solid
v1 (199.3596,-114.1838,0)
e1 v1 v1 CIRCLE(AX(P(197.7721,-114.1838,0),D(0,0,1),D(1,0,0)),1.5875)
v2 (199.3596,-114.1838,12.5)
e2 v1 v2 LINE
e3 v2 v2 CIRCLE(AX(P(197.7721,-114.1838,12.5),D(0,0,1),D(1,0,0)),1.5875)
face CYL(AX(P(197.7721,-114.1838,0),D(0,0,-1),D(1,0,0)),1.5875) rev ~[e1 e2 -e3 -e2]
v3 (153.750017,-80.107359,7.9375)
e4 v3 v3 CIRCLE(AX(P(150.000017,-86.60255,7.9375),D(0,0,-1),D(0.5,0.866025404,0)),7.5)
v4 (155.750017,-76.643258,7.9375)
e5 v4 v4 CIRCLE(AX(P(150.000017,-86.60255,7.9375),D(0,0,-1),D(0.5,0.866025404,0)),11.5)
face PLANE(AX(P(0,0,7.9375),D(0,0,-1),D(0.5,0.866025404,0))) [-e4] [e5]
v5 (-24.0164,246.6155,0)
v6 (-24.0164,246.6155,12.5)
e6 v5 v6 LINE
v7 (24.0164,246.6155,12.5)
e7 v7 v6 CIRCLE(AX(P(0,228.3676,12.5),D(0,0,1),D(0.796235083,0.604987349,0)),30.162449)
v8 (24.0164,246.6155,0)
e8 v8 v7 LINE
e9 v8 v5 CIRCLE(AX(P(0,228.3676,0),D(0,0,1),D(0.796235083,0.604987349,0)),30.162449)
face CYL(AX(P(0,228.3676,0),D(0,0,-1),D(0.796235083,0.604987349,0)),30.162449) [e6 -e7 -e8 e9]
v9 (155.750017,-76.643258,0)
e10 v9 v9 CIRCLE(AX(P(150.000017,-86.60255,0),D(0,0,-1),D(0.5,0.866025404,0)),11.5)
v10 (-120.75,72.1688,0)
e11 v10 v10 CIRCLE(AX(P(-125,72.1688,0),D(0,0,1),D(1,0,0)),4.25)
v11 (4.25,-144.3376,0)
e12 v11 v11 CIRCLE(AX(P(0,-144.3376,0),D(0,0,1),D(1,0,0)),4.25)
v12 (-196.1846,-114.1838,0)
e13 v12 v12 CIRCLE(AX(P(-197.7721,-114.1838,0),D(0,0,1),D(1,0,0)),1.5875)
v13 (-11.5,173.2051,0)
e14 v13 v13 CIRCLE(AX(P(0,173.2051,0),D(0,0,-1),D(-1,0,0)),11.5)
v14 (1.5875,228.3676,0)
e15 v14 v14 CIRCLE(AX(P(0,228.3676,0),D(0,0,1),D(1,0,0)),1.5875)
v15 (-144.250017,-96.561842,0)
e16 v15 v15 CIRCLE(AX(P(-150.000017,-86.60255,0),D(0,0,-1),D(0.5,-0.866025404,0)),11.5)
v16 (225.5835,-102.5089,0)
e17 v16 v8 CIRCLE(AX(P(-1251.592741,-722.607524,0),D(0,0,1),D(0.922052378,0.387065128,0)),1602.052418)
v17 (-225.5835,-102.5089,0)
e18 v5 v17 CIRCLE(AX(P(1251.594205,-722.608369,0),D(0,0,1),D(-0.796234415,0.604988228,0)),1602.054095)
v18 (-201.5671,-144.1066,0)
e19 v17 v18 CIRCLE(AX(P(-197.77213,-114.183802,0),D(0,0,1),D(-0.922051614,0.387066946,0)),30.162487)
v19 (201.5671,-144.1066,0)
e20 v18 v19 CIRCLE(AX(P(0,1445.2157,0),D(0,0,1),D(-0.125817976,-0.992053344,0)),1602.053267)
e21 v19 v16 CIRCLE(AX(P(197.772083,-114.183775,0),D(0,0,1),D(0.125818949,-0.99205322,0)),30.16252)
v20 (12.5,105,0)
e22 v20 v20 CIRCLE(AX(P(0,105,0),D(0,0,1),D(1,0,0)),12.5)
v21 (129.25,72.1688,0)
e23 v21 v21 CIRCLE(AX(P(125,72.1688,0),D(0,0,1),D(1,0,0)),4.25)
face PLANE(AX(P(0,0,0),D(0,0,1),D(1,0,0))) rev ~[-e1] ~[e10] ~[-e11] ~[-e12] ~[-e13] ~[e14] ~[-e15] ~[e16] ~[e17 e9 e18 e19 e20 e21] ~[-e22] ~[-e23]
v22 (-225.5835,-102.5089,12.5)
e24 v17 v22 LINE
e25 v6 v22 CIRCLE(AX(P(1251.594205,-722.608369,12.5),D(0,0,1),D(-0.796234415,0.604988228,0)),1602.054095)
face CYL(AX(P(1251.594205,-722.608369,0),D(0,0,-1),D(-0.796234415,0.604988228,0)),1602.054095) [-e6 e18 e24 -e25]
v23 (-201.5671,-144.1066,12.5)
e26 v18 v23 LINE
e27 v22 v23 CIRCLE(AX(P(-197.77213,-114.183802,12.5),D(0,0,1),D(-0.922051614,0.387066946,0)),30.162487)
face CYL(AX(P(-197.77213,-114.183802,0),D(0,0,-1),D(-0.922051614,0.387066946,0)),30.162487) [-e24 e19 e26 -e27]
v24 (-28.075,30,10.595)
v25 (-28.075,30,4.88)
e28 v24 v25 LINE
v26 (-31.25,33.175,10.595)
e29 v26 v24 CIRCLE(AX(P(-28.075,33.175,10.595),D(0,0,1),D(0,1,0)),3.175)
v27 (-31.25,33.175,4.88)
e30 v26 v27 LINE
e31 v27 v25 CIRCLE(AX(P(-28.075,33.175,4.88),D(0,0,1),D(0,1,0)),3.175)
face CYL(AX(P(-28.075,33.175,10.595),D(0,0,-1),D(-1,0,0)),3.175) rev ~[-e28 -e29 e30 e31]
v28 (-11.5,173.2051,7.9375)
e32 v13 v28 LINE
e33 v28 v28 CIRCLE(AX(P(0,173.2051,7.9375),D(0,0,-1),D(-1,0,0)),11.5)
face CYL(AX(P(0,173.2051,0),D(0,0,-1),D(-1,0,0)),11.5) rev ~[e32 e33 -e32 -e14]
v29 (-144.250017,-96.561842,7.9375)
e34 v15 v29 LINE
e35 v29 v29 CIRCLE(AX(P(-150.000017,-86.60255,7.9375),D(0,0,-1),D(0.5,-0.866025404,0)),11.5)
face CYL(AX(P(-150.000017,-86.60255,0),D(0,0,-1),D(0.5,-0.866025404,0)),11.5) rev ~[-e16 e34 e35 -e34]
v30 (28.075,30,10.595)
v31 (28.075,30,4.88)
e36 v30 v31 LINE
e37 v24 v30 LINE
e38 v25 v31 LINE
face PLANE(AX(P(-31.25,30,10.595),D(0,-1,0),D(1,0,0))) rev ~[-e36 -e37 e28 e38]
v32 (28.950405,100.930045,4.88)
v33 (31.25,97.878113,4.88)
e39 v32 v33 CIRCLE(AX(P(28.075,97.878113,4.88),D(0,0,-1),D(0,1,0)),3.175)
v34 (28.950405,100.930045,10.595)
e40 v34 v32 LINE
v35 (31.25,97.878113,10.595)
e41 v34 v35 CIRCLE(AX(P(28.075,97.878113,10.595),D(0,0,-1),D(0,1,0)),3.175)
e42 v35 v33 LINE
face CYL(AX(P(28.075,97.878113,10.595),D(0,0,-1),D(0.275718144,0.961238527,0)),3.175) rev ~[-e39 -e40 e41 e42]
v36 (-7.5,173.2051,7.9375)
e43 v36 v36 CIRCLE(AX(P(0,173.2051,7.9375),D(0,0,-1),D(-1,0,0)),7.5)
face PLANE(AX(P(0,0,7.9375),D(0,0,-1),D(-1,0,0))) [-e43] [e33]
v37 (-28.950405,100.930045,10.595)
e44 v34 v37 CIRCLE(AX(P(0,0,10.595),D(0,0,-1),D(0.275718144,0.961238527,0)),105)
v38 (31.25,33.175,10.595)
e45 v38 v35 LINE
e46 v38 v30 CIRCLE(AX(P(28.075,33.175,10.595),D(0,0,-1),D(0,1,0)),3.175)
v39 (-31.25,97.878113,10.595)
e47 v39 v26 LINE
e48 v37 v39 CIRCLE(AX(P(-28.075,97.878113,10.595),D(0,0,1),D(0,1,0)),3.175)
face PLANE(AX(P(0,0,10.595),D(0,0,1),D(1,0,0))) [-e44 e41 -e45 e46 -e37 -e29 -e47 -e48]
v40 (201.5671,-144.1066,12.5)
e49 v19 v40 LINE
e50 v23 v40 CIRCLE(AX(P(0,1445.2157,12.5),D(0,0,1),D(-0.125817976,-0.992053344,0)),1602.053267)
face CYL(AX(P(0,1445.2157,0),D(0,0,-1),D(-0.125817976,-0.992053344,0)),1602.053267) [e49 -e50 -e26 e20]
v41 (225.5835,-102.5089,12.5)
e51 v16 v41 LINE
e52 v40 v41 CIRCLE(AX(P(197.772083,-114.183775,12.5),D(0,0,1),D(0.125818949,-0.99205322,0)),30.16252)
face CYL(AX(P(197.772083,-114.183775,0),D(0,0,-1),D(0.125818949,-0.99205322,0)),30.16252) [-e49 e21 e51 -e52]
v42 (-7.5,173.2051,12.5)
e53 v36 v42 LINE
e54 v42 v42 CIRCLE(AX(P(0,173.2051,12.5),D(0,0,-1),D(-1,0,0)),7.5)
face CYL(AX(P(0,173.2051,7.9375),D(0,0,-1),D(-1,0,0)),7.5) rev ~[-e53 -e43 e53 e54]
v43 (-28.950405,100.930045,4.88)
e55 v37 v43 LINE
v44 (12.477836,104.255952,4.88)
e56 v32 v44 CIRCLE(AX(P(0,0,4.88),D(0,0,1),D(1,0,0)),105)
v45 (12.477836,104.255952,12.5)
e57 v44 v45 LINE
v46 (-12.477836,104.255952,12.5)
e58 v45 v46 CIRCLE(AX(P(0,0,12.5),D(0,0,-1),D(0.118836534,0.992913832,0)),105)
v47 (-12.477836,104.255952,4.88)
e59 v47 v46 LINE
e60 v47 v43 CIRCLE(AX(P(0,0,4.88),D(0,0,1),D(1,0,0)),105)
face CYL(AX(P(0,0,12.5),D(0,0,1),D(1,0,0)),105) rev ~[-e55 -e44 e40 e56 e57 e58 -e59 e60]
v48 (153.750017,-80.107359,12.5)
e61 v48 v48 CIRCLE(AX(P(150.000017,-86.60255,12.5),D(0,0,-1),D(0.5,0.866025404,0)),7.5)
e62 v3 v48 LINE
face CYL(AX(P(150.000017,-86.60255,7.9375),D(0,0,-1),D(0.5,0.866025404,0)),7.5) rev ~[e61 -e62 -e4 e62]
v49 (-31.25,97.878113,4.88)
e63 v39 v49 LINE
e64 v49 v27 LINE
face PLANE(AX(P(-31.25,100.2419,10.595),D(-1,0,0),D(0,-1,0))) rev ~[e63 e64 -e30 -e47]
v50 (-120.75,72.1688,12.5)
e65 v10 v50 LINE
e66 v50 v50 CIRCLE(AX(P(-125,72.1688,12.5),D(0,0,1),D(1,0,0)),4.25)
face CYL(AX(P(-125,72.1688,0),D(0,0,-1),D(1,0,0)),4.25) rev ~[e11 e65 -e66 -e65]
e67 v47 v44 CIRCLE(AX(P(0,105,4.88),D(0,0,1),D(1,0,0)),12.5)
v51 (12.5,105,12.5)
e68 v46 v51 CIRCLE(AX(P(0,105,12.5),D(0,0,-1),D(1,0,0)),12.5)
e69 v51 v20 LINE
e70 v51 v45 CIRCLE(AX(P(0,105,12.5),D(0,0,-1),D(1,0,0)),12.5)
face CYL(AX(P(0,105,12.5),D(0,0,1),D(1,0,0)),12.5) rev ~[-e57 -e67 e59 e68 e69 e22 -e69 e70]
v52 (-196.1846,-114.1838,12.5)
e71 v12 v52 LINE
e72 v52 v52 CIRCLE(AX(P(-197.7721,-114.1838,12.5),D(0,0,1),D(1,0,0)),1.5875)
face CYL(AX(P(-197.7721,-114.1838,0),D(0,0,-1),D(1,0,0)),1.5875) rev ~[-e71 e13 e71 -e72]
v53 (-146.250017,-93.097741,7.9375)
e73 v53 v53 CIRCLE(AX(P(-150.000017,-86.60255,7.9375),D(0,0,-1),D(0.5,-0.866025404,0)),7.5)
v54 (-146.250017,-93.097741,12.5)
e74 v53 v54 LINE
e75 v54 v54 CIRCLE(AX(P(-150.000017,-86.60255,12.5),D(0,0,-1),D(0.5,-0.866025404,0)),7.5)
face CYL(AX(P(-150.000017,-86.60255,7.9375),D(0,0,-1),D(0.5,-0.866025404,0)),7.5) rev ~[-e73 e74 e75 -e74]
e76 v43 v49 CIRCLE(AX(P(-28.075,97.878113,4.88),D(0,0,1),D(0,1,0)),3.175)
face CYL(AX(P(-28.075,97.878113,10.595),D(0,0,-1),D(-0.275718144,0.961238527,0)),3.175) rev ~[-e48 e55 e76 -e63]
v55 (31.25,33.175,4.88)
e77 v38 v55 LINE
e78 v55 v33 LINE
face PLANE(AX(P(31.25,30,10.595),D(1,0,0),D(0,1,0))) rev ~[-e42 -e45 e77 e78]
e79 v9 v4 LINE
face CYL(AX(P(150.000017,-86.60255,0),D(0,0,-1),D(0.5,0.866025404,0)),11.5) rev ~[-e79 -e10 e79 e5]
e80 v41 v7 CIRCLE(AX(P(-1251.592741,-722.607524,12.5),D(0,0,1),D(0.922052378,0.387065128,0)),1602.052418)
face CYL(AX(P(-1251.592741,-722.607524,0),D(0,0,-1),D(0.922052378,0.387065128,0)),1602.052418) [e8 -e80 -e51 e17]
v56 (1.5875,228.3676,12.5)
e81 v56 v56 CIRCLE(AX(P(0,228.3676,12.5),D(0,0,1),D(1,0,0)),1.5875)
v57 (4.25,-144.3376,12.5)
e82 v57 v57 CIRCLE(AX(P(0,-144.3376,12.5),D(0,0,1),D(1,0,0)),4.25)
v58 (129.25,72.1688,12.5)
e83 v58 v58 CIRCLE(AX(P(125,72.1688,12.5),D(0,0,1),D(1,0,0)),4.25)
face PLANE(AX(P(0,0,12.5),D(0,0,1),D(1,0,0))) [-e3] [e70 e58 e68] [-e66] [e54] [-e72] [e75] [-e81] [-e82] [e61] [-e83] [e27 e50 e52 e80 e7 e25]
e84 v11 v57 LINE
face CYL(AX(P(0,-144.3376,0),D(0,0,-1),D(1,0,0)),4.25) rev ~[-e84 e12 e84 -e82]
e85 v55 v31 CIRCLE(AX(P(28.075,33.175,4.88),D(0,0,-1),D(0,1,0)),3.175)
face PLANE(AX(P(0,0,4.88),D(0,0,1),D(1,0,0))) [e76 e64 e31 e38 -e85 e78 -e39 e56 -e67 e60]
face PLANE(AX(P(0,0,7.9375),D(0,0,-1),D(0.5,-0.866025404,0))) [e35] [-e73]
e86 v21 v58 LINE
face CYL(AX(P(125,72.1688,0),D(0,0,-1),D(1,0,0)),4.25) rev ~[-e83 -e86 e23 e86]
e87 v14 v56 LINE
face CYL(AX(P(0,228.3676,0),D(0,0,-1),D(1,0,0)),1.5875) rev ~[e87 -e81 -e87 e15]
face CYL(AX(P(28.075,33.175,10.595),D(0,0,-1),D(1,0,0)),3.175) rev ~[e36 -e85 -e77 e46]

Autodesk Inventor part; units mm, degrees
ref_plane "YZ Plane" through (0, 0, 0) normal (1, 0, 0) x (0, 1, 0)
ref_plane "XZ Plane" through (0, 0, 0) normal (0, 1, 0) x (-1, 0, 0)
ref_plane "XY Plane" through (0, 0, 0) normal (0, 0, 1) x (1, 0, 0)
sketch "Sketch1" plane through (0, 0, 0) normal (0, 0, 1) x (1, 0, 0)
  line L0 (0, -144.3376) -> (-125, 72.1688) construction
  line L1 (-125, 72.1688) -> (125, 72.1688) construction
  line L2 (125, 72.1688) -> (0, -144.3376) construction
  line L3 (0, 173.2051) -> (150, -86.6025) construction
  line L4 (150, -86.6025) -> (-150, -86.6025) construction
  line L5 (-150, -86.6025) -> (0, 173.2051) construction
  circle A0 centre (-150, -86.6025) radius 1.5875
  circle A1 centre (150, -86.6025) radius 1.5875
  circle A2 centre (0, 173.2051) radius 1.5875
  circle A3 centre (-125, 72.1688) radius 4.25
  circle A4 centre (125, 72.1688) radius 4.25
  circle A5 centre (0, -144.3376) radius 4.25
  circle A6 centre (-150, -86.6025) radius 25 construction
  line L6 (-250.0151, -144.3463) -> (0, 288.6926) construction
  line L7 (0, 288.6926) -> (250.0151, -144.3463) construction
  line L8 (250.0151, -144.3463) -> (-250.0151, -144.3463) construction
  arc A7 (-225.5835, -102.5089) -> (-201.5671, -144.1066) centre (-197.7721, -114.1838) ccw
  circle A8 centre (-125, 72.1688) radius 12.5 construction
  arc A9 (24.0164, 246.6155) -> (-24.0164, 246.6155) centre (0, 228.3676) ccw
  arc A10 (201.5671, -144.1066) -> (225.5835, -102.5089) centre (197.7721, -114.1838) ccw
  arc A11 (-24.0164, 246.6155) -> (-225.5835, -102.5089) centre (1251.5935, -722.6079) ccw
  arc A12 (225.5835, -102.5089) -> (24.0164, 246.6155) centre (-1251.5935, -722.6079) ccw
  arc A13 (-201.5671, -144.1066) -> (201.5671, -144.1066) centre (0, 1445.2157) ccw
  circle A14 centre (0, 228.3676) radius 1.5875
  circle A15 centre (-197.7721, -114.1838) radius 1.5875
  circle A16 centre (197.7721, -114.1838) radius 1.5875
  point P0 (0, 0)
  point P1 (0, 0)
  point P2 (0, 0)
  point P3 (0, 0)
  dimension "d0" = 300
  dimension "d1" = 250
  dimension "d2" = 3.175
  dimension "d3" = 8.5
  dimension "d4" = 50
  dimension "d5" = 60.325
  dimension "d6" = 25
  dimension "d9" = 3.175
extrude "Extrusion2" add sketch "Sketch1" along normal blind 12.5
sketch "Sketch2" plane through (0, 0, 12.5) normal (0, 0, 1) x (1, 0, 0)
  circle A0 centre (0, 0) radius 105
  dimension "d12" = 210
extrude "Extrusion3" cut sketch "Sketch2" against normal blind 1.905
sketch "Sketch3" plane through (0, 0, 10.595) normal (0, 0, 1) x (1, 0, 0)
  circle A0 centre (0, 0) radius 105 projected
  line L0 (-31.25, 100.2419) -> (-31.25, 30)
  line L1 (-31.25, 30) -> (31.25, 30)
  line L2 (31.25, 30) -> (31.25, 100.2419)
  line L3 (0, 30) -> (0, 105) construction
  dimension "d16" = 75
  dimension "d18" = 62.5
extrude "Extrusion4" cut sketch "Sketch3" against normal blind 5.715 contours L2 L1 L0 A0 picked at (2.1141, 54.9361)
sketch "Sketch4" plane through (0, 0, 12.5) normal (0, 0, 1) x (1, 0, 0)
  circle A0 centre (0, 0) radius 105 projected
  circle A1 centre (0, 105) radius 12.5
  dimension "d21" = 25
extrude "Extrusion5" cut sketch "Sketch4" against normal through all contours A1 A0 | A0 A1 picked at (-0.4833, 100.8063) picked at (0.3884, 109.0934)
fillet "Fillet1" radius 3.175 4 edges at (-31.25, 100.2419, 7.7375) (31.25, 100.2419, 7.7375) (31.25, 30, 7.7375) (-31.25, 30, 7.7375)
sketch "Sketch8" plane through (0, 0, 0) normal (0, 0, -1) x (-1, 0, 0)
  circle A0 centre (0, 173.2051) radius 1.5875 projected
  circle A1 centre (0, 173.2051) radius 11.5
  point P0 (0, 0)
  dimension "d34" = 23
extrude "Extrusion9" cut sketch "Sketch8" against normal blind 7.9375
sketch "Sketch9" plane through (0, 173.2051, 7.9375) normal (0, 0, -1) x (-1, 0, 0)
  circle A0 centre (0, 0) radius 1.5875 projected
  circle A1 centre (0, 0) radius 11.5 projected
  circle A2 centre (0, 0) radius 7.5
  point P0 (0, -173.2051)
  dimension "d38" = 15
extrude "Extrusion10" cut sketch "Sketch9" against normal through all contours A2
pattern_circular "Circular Pattern1" count 3 over 360 about axis through (0, 0, 12.5) along (0, 0, -1) of "Extrusion10", "Extrusion9"
sketch "Sketch5" plane through (0, 0, 12.5) normal (0, 0, 1) x (1, 0, 0)
  arc A0 (24.0164, 246.6155) -> (-24.0164, 246.6155) centre (0, 228.3676) ccw projected
  arc A1 (201.5671, -144.1066) -> (225.5835, -102.5089) centre (197.7721, -114.1838) ccw projected
  circle A2 centre (0, 228.3676) radius 1.5875 projected
  circle A3 centre (-197.7721, -114.1838) radius 1.5875 projected
  circle A4 centre (197.7721, -114.1838) radius 1.5875 projected
  circle A5 centre (0, 228.3676) radius 30.1625
  circle A6 centre (197.7721, -114.1838) radius 30.1625
  circle A7 centre (-197.7721, -114.1838) radius 30.1625
sketch "Sketch6" plane through (-193.442, -111.6838, 571.3) normal (0, 0, 1) x (1, 0, 0)
  circle A0 centre (0, 0) radius 1.5875 projected
  circle A1 centre (0, 0) radius 30.1625 projected
  arc A2 (205.9198, 215.9397) -> (180.9642, 215.9397) centre (193.442, 216.6838) ccw projected
  arc A3 (180.9642, 215.9397) -> (205.9198, 215.9397) centre (193.442, 111.6838) ccw projected
  circle A4 centre (193.442, -32.6538) radius 4.25 projected
  circle A5 centre (318.442, 183.8526) radius 4.25 projected
  circle A6 centre (68.442, 183.8526) radius 4.25 projected
  circle A7 centre (193.442, 284.8889) radius 1.5875 projected
  circle A8 centre (343.442, 25.0812) radius 1.5875 projected
  circle A9 centre (43.442, 25.0812) radius 1.5875 projected
  arc A10 (-4.6471, -29.8024) -> (-28.1332, 10.8766) centre (0, 0) ccw projected
  arc A11 (-4.6471, -29.8024) -> (391.5311, -29.8024) centre (193.442, 1240.5571) ccw projected
  arc A12 (415.0172, 10.8766) -> (391.5311, -29.8024) centre (386.884, 0) ccw projected
  arc A13 (415.0172, 10.8766) -> (216.928, 353.9771) centre (-784.1909, -452.7528) ccw projected
  arc A14 (169.956, 353.9771) -> (216.928, 353.9771) centre (193.442, 335.0514) ccw projected
  arc A15 (169.956, 353.9771) -> (-28.1332, 10.8766) centre (1171.0749, -452.7528) ccw projected
  circle A16 centre (193.442, 335.0514) radius 1.5875 projected
  circle A17 centre (193.442, 335.0514) radius 30.1625 projected
  circle A18 centre (386.884, 0) radius 1.5875 projected
  circle A19 centre (386.884, 0) radius 30.1625 projected
sketch "Sketch7" plane through (-193.442, -111.6838, -89.1) normal (0, 0, -1) x (-1, 0, 0)
  circle A0 centre (0, 0) radius 30.1625 projected
  circle A1 centre (-68.442, 183.8526) radius 4.25 projected
  circle A2 centre (-318.442, 183.8526) radius 4.25 projected
  circle A3 centre (-193.442, -32.6538) radius 4.25 projected
  circle A4 centre (-43.442, 25.0812) radius 1.5875 projected
  circle A5 centre (-343.442, 25.0812) radius 1.5875 projected
  circle A6 centre (-193.442, 284.8889) radius 1.5875 projected
  circle A7 centre (-386.884, 0) radius 1.5875 projected
  circle A8 centre (-193.442, 335.0514) radius 1.5875 projected
  circle A9 centre (0, 0) radius 1.5875 projected
  arc A10 (-169.956, 353.9771) -> (-216.928, 353.9771) centre (-193.442, 335.0514) ccw projected
  arc A11 (28.1332, 10.8766) -> (-169.956, 353.9771) centre (-1171.0749, -452.7528) ccw projected
  arc A12 (-391.5311, -29.8024) -> (4.6471, -29.8024) centre (-193.442, 1240.5571) ccw projected
  arc A13 (-415.0172, 10.8766) -> (-391.5311, -29.8024) centre (-386.884, 0) ccw projected
  arc A14 (-216.928, 353.9771) -> (-415.0172, 10.8766) centre (784.1909, -452.7528) ccw projected
  arc A15 (4.6471, -29.8024) -> (28.1332, 10.8766) centre (0, 0) ccw projected
  point P0 (-193.442, 111.6838)
properties part number "MID PLATE"
